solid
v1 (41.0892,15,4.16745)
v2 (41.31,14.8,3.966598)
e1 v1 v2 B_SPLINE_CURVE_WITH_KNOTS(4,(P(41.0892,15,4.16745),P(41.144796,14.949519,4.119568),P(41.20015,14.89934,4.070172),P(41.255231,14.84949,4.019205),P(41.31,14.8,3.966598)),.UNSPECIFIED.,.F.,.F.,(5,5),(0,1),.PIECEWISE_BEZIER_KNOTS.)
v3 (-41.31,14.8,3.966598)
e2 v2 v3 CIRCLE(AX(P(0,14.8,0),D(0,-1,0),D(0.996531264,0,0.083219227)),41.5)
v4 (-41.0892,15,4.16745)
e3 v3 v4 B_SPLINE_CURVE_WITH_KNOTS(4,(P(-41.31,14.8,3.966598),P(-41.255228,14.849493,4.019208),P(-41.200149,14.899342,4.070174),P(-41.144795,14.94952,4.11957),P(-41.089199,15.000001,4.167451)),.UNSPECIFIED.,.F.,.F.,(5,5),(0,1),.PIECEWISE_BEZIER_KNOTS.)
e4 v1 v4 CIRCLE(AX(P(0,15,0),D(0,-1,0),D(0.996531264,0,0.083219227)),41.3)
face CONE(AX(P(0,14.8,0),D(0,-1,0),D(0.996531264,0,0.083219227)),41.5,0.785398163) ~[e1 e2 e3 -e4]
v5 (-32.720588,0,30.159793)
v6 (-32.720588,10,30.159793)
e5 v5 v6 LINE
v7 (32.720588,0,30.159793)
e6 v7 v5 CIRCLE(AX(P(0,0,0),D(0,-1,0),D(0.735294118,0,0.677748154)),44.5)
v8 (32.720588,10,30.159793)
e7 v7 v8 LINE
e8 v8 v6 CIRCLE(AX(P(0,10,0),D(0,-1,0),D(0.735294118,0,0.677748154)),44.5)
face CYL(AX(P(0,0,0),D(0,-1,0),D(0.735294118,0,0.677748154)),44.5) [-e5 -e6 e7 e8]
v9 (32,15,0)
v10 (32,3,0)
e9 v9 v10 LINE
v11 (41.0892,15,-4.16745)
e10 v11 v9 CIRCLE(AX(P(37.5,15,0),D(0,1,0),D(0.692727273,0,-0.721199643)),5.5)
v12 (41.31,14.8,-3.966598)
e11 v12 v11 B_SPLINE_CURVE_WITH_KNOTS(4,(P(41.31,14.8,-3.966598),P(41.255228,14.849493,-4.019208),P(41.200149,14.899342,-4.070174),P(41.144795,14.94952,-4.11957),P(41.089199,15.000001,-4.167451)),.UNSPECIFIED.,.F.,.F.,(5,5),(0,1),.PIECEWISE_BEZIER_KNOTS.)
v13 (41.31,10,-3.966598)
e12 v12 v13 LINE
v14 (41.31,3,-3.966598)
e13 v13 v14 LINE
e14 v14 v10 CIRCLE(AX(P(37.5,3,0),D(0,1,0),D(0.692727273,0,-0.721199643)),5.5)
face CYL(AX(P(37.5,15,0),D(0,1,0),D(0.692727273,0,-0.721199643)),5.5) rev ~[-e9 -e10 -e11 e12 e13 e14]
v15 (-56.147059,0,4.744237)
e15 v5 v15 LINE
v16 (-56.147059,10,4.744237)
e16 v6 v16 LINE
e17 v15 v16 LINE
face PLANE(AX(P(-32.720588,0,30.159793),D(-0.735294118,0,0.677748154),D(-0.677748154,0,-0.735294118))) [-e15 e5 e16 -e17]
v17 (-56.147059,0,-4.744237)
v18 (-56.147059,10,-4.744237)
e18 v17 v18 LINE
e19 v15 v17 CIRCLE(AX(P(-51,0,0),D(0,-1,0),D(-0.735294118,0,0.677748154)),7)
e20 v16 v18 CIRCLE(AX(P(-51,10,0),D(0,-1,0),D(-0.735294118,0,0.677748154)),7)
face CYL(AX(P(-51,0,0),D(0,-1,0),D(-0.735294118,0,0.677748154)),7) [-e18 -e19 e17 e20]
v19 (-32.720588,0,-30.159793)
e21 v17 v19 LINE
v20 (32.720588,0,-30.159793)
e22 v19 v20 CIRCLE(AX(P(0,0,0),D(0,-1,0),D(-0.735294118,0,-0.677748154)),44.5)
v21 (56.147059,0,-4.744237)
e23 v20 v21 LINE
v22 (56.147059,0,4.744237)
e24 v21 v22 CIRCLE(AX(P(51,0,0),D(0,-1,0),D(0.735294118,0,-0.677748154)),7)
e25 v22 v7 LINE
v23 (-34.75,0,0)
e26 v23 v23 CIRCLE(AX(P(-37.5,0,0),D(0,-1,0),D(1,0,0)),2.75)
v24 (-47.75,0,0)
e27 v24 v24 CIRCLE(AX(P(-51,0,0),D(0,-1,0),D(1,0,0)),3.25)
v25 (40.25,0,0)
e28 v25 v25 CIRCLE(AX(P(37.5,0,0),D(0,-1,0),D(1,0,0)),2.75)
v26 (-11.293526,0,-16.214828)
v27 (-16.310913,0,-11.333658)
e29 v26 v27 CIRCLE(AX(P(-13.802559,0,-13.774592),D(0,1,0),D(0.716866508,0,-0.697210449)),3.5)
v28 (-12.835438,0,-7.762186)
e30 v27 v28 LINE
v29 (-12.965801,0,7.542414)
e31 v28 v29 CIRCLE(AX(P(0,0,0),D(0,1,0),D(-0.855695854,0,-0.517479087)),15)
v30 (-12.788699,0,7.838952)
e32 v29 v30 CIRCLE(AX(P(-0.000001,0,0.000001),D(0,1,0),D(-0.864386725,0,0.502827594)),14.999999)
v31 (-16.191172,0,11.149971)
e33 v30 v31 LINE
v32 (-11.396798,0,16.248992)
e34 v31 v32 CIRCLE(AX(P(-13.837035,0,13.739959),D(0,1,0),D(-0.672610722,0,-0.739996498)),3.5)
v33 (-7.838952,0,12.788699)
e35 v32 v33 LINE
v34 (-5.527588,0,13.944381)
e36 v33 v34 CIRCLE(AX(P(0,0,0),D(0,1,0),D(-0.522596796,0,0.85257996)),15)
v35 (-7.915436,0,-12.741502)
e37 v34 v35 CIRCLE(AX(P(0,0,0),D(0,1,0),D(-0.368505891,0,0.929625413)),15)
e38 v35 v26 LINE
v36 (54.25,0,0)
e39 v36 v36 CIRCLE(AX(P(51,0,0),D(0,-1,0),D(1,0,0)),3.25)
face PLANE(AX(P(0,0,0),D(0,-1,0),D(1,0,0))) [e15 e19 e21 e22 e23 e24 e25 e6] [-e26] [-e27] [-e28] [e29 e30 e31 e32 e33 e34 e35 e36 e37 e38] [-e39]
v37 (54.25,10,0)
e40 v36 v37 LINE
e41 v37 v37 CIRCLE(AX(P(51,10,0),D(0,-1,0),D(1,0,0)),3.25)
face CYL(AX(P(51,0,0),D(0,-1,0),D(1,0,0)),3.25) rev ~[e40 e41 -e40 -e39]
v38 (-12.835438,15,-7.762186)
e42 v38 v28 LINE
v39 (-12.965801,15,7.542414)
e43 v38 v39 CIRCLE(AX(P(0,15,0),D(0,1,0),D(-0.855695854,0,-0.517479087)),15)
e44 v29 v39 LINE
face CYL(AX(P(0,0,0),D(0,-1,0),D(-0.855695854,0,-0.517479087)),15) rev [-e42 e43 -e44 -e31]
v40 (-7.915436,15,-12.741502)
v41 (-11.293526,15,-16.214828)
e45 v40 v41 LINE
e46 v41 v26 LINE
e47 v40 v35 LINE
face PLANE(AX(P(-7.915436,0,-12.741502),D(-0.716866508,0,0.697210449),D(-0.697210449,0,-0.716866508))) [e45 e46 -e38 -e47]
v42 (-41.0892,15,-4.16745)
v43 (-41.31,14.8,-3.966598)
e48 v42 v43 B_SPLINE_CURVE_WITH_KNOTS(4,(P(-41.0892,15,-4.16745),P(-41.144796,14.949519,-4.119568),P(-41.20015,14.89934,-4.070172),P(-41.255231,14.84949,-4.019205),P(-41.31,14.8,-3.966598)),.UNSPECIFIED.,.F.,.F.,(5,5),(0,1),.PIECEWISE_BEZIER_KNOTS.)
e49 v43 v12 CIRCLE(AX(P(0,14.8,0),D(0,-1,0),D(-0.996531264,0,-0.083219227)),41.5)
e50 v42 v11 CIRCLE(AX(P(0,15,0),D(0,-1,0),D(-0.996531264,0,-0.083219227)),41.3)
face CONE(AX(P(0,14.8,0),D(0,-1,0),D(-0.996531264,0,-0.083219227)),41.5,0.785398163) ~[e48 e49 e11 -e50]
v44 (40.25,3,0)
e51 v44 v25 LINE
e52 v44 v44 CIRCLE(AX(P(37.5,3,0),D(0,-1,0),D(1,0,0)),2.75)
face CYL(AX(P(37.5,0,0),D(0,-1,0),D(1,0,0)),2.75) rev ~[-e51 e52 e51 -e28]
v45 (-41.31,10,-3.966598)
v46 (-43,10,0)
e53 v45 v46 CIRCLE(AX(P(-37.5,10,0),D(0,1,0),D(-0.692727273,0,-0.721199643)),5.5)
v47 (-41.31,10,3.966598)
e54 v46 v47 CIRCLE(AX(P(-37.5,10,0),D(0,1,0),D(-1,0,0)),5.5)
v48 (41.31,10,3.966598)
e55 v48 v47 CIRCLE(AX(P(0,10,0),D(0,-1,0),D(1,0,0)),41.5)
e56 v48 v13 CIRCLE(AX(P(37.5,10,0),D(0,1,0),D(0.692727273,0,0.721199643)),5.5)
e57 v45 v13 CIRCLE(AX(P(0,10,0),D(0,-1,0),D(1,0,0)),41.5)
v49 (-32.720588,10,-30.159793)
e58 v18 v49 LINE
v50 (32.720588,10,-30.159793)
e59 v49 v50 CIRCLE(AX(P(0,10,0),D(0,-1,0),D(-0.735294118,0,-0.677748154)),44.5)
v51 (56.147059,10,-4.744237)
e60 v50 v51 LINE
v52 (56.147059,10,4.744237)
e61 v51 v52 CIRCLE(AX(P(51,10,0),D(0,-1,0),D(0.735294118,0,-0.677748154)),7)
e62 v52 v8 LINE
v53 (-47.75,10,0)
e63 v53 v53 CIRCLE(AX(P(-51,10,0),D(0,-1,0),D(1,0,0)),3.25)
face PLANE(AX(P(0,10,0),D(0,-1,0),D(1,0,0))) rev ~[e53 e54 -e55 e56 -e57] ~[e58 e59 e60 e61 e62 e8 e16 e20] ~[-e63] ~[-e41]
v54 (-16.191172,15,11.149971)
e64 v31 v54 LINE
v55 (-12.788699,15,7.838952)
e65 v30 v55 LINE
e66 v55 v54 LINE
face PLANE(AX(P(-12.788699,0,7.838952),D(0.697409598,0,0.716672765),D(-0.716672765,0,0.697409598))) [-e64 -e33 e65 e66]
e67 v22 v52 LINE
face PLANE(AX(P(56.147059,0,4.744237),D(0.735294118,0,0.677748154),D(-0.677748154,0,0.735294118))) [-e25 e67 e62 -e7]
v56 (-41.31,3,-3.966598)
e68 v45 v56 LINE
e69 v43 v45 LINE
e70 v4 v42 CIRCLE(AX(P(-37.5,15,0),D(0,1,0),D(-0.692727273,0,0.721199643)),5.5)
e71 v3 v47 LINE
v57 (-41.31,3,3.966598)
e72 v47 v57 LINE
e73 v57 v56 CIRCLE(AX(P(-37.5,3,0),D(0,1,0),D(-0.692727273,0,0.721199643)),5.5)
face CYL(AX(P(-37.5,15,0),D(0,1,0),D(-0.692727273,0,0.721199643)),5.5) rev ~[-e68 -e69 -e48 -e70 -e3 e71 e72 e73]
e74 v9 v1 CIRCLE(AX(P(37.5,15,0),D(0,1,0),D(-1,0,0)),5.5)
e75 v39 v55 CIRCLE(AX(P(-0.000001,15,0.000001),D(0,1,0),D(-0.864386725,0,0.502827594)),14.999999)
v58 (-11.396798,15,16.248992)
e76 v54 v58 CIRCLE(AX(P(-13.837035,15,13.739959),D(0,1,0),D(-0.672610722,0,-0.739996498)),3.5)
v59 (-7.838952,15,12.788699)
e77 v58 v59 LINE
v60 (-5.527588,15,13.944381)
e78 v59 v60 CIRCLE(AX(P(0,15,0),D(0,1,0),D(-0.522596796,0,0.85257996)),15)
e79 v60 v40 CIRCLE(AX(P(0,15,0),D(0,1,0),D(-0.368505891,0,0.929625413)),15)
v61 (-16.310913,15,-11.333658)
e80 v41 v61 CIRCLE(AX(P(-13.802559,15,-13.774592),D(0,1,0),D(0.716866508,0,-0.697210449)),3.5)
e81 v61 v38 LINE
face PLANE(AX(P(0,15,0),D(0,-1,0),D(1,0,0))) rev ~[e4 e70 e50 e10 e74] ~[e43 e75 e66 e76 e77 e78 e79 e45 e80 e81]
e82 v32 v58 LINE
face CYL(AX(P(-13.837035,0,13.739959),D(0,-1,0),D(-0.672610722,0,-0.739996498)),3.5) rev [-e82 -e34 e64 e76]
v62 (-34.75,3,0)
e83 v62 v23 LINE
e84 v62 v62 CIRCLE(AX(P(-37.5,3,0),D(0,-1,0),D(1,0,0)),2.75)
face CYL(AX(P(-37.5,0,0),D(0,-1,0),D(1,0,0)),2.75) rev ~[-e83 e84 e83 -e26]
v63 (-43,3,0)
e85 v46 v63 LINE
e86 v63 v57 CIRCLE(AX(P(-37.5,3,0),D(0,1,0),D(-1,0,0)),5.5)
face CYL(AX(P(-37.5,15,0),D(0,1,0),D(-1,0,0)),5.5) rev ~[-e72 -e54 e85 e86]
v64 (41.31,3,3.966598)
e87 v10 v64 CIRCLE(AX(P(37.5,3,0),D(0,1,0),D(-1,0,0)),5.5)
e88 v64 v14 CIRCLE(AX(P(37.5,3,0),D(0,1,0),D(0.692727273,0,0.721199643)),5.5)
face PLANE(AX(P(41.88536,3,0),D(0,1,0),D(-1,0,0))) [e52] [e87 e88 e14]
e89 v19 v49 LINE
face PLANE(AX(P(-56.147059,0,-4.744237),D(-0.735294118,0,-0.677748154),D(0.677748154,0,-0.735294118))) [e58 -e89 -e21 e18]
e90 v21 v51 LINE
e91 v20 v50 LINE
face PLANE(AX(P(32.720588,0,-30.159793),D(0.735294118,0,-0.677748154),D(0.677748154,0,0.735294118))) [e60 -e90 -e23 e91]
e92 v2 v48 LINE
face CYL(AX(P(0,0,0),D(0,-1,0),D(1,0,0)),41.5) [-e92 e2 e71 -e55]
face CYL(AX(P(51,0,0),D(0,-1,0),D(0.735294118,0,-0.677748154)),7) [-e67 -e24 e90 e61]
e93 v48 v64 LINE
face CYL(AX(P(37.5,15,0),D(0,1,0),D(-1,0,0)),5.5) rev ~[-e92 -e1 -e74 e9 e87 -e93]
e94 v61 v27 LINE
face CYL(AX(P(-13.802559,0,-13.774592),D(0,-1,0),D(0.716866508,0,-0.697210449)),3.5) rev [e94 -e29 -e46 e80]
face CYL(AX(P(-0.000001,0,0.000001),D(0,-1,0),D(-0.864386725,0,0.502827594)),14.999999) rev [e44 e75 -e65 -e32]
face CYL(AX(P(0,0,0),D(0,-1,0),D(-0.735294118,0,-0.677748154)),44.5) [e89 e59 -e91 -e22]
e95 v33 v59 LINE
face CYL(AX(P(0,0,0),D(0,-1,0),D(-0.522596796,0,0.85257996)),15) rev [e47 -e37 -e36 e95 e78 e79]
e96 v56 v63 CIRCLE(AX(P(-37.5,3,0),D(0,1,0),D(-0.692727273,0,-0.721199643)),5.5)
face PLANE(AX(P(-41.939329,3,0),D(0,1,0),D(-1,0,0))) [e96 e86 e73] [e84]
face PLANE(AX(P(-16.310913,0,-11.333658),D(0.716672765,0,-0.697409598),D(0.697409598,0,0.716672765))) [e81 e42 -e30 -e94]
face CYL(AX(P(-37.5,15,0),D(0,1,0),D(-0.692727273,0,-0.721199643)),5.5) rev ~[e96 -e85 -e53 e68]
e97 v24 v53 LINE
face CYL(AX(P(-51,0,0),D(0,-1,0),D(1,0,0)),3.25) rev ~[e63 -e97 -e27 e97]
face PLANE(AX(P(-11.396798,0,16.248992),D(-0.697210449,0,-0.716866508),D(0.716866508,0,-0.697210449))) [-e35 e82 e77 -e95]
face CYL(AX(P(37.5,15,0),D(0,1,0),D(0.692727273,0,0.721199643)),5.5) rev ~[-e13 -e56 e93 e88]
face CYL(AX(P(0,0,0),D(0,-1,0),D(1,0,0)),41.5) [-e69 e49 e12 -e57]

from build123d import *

# Parameters (mm, degrees)
F0_R        = 3.25
F0_R_2      = 41.5
F0_R_3      = 2.75
F1_DEPTH    = 10
F2_DEPTH    = 15
F3_R        = 2.75
F4_DEPTH    = 12
F5_T2_ANGLE = 170.4527374882
F5_T4_ANGLE = 170.4527374882


# Not quite as in the source:
# - a fillet or chamfer that OpenCascade refuses, or shapes differently, is made with other operations: its cross-section is extruded or revolved along the edge and cut away or added


with BuildPart() as f1:
    # F0 (on Front) → F1 (new body)
    with BuildSketch(Plane.XZ):
        with BuildLine():
            Line((56.1470588235, 4.7442370796), (32.7205882353, 30.159792863))
            ThreePointArc((32.7205882353, 30.159792863), (0, 44.5), (-32.7205882353, 30.159792863))
            Line((-32.7205882353, 30.159792863), (-56.1470588235, 4.7442370796))
            ThreePointArc((-56.1470588235, 4.7442370796), (-58, 0), (-56.1470588235, -4.7442370796))
            Line((-56.1470588235, -4.7442370796), (-32.7205882353, -30.159792863))
            ThreePointArc((-32.7205882353, -30.159792863), (0, -44.5), (32.7205882353, -30.159792863))
            Line((32.7205882353, -30.159792863), (56.1470588235, -4.7442370796))
            ThreePointArc((56.1470588235, -4.7442370796), (58, 0), (56.1470588235, 4.7442370796))
        make_face()
        with Locations((-51, 0)):
            Circle(F0_R, mode=Mode.SUBTRACT)
        Circle(F0_R_2, mode=Mode.SUBTRACT)
        with Locations((51, 0)):
            Circle(F0_R, mode=Mode.SUBTRACT)
        Circle(F0_R_2)
        with BuildLine():
            ThreePointArc((-5.5275883623, 13.9443811945), (14.9403084329, -1.336855987), (-7.9154361587, -12.7415018902))
            Line((-7.9154361587, -12.7415018902), (-11.2935258895, -16.2148281895))
            ThreePointArc((-11.2935258895, -16.2148281895), (-16.2431437728, -16.28328537), (-16.3109133443, -11.3336580242))
            Line((-16.3109133443, -11.3336580242), (-12.8354378119, -7.7621863014))
            ThreePointArc((-12.8354378119, -7.7621863014), (-14.9994558699, -0.1277638746), (-12.9658008757, 7.5424139141))
            ThreePointArc((-12.9658008757, 7.5424139141), (-12.8781036996, 7.6911926971), (-12.7886994065, 7.8389519382))
            Line((-12.7886994065, 7.8389519382), (-16.1911722961, 11.1499710909))
            ThreePointArc((-16.1911722961, 11.1499710909), (-16.3869084591, 16.1374875976), (-11.3967981993, 16.2489916113))
            Line((-11.3967981993, 16.2489916113), (-7.8389519382, 12.7886994065))
            ThreePointArc((-7.8389519382, 12.7886994065), (-6.7082039325, 13.416407865), (-5.5275883623, 13.9443811945))
        make_face(mode=Mode.SUBTRACT)
        with Locations((-37.5, 0)):
            Circle(F0_R_3, mode=Mode.SUBTRACT)
        with Locations((37.5, 0)):
            Circle(F0_R_3, mode=Mode.SUBTRACT)
    extrude(amount=-F1_DEPTH)

    # F0 (on Front) → F2 (join)
    with BuildSketch(Plane.XZ):
        Circle(F0_R_2)
        with BuildLine():
            ThreePointArc((-5.5275883623, 13.9443811945), (14.9403084329, -1.336855987), (-7.9154361587, -12.7415018902))
            Line((-7.9154361587, -12.7415018902), (-11.2935258895, -16.2148281895))
            ThreePointArc((-11.2935258895, -16.2148281895), (-16.2431437728, -16.28328537), (-16.3109133443, -11.3336580242))
            Line((-16.3109133443, -11.3336580242), (-12.8354378119, -7.7621863014))
            ThreePointArc((-12.8354378119, -7.7621863014), (-14.9994558699, -0.1277638746), (-12.9658008757, 7.5424139141))
            ThreePointArc((-12.9658008757, 7.5424139141), (-12.8781036996, 7.6911926971), (-12.7886994065, 7.8389519382))
            Line((-12.7886994065, 7.8389519382), (-16.1911722961, 11.1499710909))
            ThreePointArc((-16.1911722961, 11.1499710909), (-16.3869084591, 16.1374875976), (-11.3967981993, 16.2489916113))
            Line((-11.3967981993, 16.2489916113), (-7.8389519382, 12.7886994065))
            ThreePointArc((-7.8389519382, 12.7886994065), (-6.7082039325, 13.416407865), (-5.5275883623, 13.9443811945))
        make_face(mode=Mode.SUBTRACT)
        with Locations((-37.5, 0)):
            Circle(F0_R_3, mode=Mode.SUBTRACT)
        with Locations((37.5, 0)):
            Circle(F0_R_3, mode=Mode.SUBTRACT)
    extrude(amount=-F2_DEPTH)

    # F3 (on face) → F4 (cut)
    with BuildSketch(Plane(origin=(0, 15, 0), x_dir=(-1, 0, 0), z_dir=(0, 1, 0))):
        with BuildLine():
            ThreePointArc((41.31, -3.9665980386), (42.5598913032, -2.1558061137), (43, 0))
            ThreePointArc((43, 0), (42.5598913032, 2.1558061137), (41.31, 3.9665980386))
            ThreePointArc((41.31, 3.9665980386), (41.4524727851, 1.9855729652), (41.5, 0))
            ThreePointArc((41.5, 0), (41.4524727851, -1.9855729652), (41.31, -3.9665980386))
        make_face()
        with BuildLine():
            ThreePointArc((41.5, 0), (41.4524727851, 1.9855729652), (41.31, 3.9665980386))
            ThreePointArc((41.31, 3.9665980386), (32, 0), (41.31, -3.9665980386))
            ThreePointArc((41.31, -3.9665980386), (41.4524727851, -1.9855729652), (41.5, 0))
        make_face()
        with Locations((37.5, 0)):
            Circle(F3_R, mode=Mode.SUBTRACT)
        with BuildLine():
            ThreePointArc((-41.31, -3.9665980386), (-41.5, 0), (-41.31, 3.9665980386))
            ThreePointArc((-41.31, 3.9665980386), (-43, 0), (-41.31, -3.9665980386))
        make_face()
        with BuildLine():
            ThreePointArc((-32, 0), (-35.3441938863, 5.0598913032), (-41.31, 3.9665980386))
            ThreePointArc((-41.31, 3.9665980386), (-41.5, 0), (-41.31, -3.9665980386))
            ThreePointArc((-41.31, -3.9665980386), (-35.3441938863, -5.0598913032), (-32, 0))
        make_face()
        with Locations((-37.5, 0)):
            Circle(F3_R, mode=Mode.SUBTRACT)
        with Locations((37.5, 0)):
            Circle(F3_R)
        with Locations((-37.5, 0)):
            Circle(F3_R)
    extrude(amount=-F4_DEPTH, mode=Mode.SUBTRACT)

    # F5: chamfer of 0.2 on 2 edges, made by hand

    # F5_s1 → F5_t2 (revolve, cut)
    with BuildSketch(Plane(origin=(0, 0, 0), x_dir=(0, 1, 0), z_dir=(0.0832192271, 0, -0.9965312641))):
        Polygon((14.8, 41.5), (15, 41.3), (15, 41.5), align=None)
    revolve(axis=Axis((0, 15, 0), (0, -1, 0)), revolution_arc=F5_T2_ANGLE, mode=Mode.SUBTRACT)

    # F5_s3 → F5_t4 (revolve, cut)
    with BuildSketch(Plane(origin=(0, 0, 0), x_dir=(0, 1, 0), z_dir=(-0.0832192271, 0, 0.9965312641))):
        Polygon((14.8, 41.5), (15, 41.3), (15, 41.5), align=None)
    revolve(axis=Axis((0, 15, 0), (0, -1, 0)), revolution_arc=F5_T4_ANGLE, mode=Mode.SUBTRACT)


solid = f1.part
